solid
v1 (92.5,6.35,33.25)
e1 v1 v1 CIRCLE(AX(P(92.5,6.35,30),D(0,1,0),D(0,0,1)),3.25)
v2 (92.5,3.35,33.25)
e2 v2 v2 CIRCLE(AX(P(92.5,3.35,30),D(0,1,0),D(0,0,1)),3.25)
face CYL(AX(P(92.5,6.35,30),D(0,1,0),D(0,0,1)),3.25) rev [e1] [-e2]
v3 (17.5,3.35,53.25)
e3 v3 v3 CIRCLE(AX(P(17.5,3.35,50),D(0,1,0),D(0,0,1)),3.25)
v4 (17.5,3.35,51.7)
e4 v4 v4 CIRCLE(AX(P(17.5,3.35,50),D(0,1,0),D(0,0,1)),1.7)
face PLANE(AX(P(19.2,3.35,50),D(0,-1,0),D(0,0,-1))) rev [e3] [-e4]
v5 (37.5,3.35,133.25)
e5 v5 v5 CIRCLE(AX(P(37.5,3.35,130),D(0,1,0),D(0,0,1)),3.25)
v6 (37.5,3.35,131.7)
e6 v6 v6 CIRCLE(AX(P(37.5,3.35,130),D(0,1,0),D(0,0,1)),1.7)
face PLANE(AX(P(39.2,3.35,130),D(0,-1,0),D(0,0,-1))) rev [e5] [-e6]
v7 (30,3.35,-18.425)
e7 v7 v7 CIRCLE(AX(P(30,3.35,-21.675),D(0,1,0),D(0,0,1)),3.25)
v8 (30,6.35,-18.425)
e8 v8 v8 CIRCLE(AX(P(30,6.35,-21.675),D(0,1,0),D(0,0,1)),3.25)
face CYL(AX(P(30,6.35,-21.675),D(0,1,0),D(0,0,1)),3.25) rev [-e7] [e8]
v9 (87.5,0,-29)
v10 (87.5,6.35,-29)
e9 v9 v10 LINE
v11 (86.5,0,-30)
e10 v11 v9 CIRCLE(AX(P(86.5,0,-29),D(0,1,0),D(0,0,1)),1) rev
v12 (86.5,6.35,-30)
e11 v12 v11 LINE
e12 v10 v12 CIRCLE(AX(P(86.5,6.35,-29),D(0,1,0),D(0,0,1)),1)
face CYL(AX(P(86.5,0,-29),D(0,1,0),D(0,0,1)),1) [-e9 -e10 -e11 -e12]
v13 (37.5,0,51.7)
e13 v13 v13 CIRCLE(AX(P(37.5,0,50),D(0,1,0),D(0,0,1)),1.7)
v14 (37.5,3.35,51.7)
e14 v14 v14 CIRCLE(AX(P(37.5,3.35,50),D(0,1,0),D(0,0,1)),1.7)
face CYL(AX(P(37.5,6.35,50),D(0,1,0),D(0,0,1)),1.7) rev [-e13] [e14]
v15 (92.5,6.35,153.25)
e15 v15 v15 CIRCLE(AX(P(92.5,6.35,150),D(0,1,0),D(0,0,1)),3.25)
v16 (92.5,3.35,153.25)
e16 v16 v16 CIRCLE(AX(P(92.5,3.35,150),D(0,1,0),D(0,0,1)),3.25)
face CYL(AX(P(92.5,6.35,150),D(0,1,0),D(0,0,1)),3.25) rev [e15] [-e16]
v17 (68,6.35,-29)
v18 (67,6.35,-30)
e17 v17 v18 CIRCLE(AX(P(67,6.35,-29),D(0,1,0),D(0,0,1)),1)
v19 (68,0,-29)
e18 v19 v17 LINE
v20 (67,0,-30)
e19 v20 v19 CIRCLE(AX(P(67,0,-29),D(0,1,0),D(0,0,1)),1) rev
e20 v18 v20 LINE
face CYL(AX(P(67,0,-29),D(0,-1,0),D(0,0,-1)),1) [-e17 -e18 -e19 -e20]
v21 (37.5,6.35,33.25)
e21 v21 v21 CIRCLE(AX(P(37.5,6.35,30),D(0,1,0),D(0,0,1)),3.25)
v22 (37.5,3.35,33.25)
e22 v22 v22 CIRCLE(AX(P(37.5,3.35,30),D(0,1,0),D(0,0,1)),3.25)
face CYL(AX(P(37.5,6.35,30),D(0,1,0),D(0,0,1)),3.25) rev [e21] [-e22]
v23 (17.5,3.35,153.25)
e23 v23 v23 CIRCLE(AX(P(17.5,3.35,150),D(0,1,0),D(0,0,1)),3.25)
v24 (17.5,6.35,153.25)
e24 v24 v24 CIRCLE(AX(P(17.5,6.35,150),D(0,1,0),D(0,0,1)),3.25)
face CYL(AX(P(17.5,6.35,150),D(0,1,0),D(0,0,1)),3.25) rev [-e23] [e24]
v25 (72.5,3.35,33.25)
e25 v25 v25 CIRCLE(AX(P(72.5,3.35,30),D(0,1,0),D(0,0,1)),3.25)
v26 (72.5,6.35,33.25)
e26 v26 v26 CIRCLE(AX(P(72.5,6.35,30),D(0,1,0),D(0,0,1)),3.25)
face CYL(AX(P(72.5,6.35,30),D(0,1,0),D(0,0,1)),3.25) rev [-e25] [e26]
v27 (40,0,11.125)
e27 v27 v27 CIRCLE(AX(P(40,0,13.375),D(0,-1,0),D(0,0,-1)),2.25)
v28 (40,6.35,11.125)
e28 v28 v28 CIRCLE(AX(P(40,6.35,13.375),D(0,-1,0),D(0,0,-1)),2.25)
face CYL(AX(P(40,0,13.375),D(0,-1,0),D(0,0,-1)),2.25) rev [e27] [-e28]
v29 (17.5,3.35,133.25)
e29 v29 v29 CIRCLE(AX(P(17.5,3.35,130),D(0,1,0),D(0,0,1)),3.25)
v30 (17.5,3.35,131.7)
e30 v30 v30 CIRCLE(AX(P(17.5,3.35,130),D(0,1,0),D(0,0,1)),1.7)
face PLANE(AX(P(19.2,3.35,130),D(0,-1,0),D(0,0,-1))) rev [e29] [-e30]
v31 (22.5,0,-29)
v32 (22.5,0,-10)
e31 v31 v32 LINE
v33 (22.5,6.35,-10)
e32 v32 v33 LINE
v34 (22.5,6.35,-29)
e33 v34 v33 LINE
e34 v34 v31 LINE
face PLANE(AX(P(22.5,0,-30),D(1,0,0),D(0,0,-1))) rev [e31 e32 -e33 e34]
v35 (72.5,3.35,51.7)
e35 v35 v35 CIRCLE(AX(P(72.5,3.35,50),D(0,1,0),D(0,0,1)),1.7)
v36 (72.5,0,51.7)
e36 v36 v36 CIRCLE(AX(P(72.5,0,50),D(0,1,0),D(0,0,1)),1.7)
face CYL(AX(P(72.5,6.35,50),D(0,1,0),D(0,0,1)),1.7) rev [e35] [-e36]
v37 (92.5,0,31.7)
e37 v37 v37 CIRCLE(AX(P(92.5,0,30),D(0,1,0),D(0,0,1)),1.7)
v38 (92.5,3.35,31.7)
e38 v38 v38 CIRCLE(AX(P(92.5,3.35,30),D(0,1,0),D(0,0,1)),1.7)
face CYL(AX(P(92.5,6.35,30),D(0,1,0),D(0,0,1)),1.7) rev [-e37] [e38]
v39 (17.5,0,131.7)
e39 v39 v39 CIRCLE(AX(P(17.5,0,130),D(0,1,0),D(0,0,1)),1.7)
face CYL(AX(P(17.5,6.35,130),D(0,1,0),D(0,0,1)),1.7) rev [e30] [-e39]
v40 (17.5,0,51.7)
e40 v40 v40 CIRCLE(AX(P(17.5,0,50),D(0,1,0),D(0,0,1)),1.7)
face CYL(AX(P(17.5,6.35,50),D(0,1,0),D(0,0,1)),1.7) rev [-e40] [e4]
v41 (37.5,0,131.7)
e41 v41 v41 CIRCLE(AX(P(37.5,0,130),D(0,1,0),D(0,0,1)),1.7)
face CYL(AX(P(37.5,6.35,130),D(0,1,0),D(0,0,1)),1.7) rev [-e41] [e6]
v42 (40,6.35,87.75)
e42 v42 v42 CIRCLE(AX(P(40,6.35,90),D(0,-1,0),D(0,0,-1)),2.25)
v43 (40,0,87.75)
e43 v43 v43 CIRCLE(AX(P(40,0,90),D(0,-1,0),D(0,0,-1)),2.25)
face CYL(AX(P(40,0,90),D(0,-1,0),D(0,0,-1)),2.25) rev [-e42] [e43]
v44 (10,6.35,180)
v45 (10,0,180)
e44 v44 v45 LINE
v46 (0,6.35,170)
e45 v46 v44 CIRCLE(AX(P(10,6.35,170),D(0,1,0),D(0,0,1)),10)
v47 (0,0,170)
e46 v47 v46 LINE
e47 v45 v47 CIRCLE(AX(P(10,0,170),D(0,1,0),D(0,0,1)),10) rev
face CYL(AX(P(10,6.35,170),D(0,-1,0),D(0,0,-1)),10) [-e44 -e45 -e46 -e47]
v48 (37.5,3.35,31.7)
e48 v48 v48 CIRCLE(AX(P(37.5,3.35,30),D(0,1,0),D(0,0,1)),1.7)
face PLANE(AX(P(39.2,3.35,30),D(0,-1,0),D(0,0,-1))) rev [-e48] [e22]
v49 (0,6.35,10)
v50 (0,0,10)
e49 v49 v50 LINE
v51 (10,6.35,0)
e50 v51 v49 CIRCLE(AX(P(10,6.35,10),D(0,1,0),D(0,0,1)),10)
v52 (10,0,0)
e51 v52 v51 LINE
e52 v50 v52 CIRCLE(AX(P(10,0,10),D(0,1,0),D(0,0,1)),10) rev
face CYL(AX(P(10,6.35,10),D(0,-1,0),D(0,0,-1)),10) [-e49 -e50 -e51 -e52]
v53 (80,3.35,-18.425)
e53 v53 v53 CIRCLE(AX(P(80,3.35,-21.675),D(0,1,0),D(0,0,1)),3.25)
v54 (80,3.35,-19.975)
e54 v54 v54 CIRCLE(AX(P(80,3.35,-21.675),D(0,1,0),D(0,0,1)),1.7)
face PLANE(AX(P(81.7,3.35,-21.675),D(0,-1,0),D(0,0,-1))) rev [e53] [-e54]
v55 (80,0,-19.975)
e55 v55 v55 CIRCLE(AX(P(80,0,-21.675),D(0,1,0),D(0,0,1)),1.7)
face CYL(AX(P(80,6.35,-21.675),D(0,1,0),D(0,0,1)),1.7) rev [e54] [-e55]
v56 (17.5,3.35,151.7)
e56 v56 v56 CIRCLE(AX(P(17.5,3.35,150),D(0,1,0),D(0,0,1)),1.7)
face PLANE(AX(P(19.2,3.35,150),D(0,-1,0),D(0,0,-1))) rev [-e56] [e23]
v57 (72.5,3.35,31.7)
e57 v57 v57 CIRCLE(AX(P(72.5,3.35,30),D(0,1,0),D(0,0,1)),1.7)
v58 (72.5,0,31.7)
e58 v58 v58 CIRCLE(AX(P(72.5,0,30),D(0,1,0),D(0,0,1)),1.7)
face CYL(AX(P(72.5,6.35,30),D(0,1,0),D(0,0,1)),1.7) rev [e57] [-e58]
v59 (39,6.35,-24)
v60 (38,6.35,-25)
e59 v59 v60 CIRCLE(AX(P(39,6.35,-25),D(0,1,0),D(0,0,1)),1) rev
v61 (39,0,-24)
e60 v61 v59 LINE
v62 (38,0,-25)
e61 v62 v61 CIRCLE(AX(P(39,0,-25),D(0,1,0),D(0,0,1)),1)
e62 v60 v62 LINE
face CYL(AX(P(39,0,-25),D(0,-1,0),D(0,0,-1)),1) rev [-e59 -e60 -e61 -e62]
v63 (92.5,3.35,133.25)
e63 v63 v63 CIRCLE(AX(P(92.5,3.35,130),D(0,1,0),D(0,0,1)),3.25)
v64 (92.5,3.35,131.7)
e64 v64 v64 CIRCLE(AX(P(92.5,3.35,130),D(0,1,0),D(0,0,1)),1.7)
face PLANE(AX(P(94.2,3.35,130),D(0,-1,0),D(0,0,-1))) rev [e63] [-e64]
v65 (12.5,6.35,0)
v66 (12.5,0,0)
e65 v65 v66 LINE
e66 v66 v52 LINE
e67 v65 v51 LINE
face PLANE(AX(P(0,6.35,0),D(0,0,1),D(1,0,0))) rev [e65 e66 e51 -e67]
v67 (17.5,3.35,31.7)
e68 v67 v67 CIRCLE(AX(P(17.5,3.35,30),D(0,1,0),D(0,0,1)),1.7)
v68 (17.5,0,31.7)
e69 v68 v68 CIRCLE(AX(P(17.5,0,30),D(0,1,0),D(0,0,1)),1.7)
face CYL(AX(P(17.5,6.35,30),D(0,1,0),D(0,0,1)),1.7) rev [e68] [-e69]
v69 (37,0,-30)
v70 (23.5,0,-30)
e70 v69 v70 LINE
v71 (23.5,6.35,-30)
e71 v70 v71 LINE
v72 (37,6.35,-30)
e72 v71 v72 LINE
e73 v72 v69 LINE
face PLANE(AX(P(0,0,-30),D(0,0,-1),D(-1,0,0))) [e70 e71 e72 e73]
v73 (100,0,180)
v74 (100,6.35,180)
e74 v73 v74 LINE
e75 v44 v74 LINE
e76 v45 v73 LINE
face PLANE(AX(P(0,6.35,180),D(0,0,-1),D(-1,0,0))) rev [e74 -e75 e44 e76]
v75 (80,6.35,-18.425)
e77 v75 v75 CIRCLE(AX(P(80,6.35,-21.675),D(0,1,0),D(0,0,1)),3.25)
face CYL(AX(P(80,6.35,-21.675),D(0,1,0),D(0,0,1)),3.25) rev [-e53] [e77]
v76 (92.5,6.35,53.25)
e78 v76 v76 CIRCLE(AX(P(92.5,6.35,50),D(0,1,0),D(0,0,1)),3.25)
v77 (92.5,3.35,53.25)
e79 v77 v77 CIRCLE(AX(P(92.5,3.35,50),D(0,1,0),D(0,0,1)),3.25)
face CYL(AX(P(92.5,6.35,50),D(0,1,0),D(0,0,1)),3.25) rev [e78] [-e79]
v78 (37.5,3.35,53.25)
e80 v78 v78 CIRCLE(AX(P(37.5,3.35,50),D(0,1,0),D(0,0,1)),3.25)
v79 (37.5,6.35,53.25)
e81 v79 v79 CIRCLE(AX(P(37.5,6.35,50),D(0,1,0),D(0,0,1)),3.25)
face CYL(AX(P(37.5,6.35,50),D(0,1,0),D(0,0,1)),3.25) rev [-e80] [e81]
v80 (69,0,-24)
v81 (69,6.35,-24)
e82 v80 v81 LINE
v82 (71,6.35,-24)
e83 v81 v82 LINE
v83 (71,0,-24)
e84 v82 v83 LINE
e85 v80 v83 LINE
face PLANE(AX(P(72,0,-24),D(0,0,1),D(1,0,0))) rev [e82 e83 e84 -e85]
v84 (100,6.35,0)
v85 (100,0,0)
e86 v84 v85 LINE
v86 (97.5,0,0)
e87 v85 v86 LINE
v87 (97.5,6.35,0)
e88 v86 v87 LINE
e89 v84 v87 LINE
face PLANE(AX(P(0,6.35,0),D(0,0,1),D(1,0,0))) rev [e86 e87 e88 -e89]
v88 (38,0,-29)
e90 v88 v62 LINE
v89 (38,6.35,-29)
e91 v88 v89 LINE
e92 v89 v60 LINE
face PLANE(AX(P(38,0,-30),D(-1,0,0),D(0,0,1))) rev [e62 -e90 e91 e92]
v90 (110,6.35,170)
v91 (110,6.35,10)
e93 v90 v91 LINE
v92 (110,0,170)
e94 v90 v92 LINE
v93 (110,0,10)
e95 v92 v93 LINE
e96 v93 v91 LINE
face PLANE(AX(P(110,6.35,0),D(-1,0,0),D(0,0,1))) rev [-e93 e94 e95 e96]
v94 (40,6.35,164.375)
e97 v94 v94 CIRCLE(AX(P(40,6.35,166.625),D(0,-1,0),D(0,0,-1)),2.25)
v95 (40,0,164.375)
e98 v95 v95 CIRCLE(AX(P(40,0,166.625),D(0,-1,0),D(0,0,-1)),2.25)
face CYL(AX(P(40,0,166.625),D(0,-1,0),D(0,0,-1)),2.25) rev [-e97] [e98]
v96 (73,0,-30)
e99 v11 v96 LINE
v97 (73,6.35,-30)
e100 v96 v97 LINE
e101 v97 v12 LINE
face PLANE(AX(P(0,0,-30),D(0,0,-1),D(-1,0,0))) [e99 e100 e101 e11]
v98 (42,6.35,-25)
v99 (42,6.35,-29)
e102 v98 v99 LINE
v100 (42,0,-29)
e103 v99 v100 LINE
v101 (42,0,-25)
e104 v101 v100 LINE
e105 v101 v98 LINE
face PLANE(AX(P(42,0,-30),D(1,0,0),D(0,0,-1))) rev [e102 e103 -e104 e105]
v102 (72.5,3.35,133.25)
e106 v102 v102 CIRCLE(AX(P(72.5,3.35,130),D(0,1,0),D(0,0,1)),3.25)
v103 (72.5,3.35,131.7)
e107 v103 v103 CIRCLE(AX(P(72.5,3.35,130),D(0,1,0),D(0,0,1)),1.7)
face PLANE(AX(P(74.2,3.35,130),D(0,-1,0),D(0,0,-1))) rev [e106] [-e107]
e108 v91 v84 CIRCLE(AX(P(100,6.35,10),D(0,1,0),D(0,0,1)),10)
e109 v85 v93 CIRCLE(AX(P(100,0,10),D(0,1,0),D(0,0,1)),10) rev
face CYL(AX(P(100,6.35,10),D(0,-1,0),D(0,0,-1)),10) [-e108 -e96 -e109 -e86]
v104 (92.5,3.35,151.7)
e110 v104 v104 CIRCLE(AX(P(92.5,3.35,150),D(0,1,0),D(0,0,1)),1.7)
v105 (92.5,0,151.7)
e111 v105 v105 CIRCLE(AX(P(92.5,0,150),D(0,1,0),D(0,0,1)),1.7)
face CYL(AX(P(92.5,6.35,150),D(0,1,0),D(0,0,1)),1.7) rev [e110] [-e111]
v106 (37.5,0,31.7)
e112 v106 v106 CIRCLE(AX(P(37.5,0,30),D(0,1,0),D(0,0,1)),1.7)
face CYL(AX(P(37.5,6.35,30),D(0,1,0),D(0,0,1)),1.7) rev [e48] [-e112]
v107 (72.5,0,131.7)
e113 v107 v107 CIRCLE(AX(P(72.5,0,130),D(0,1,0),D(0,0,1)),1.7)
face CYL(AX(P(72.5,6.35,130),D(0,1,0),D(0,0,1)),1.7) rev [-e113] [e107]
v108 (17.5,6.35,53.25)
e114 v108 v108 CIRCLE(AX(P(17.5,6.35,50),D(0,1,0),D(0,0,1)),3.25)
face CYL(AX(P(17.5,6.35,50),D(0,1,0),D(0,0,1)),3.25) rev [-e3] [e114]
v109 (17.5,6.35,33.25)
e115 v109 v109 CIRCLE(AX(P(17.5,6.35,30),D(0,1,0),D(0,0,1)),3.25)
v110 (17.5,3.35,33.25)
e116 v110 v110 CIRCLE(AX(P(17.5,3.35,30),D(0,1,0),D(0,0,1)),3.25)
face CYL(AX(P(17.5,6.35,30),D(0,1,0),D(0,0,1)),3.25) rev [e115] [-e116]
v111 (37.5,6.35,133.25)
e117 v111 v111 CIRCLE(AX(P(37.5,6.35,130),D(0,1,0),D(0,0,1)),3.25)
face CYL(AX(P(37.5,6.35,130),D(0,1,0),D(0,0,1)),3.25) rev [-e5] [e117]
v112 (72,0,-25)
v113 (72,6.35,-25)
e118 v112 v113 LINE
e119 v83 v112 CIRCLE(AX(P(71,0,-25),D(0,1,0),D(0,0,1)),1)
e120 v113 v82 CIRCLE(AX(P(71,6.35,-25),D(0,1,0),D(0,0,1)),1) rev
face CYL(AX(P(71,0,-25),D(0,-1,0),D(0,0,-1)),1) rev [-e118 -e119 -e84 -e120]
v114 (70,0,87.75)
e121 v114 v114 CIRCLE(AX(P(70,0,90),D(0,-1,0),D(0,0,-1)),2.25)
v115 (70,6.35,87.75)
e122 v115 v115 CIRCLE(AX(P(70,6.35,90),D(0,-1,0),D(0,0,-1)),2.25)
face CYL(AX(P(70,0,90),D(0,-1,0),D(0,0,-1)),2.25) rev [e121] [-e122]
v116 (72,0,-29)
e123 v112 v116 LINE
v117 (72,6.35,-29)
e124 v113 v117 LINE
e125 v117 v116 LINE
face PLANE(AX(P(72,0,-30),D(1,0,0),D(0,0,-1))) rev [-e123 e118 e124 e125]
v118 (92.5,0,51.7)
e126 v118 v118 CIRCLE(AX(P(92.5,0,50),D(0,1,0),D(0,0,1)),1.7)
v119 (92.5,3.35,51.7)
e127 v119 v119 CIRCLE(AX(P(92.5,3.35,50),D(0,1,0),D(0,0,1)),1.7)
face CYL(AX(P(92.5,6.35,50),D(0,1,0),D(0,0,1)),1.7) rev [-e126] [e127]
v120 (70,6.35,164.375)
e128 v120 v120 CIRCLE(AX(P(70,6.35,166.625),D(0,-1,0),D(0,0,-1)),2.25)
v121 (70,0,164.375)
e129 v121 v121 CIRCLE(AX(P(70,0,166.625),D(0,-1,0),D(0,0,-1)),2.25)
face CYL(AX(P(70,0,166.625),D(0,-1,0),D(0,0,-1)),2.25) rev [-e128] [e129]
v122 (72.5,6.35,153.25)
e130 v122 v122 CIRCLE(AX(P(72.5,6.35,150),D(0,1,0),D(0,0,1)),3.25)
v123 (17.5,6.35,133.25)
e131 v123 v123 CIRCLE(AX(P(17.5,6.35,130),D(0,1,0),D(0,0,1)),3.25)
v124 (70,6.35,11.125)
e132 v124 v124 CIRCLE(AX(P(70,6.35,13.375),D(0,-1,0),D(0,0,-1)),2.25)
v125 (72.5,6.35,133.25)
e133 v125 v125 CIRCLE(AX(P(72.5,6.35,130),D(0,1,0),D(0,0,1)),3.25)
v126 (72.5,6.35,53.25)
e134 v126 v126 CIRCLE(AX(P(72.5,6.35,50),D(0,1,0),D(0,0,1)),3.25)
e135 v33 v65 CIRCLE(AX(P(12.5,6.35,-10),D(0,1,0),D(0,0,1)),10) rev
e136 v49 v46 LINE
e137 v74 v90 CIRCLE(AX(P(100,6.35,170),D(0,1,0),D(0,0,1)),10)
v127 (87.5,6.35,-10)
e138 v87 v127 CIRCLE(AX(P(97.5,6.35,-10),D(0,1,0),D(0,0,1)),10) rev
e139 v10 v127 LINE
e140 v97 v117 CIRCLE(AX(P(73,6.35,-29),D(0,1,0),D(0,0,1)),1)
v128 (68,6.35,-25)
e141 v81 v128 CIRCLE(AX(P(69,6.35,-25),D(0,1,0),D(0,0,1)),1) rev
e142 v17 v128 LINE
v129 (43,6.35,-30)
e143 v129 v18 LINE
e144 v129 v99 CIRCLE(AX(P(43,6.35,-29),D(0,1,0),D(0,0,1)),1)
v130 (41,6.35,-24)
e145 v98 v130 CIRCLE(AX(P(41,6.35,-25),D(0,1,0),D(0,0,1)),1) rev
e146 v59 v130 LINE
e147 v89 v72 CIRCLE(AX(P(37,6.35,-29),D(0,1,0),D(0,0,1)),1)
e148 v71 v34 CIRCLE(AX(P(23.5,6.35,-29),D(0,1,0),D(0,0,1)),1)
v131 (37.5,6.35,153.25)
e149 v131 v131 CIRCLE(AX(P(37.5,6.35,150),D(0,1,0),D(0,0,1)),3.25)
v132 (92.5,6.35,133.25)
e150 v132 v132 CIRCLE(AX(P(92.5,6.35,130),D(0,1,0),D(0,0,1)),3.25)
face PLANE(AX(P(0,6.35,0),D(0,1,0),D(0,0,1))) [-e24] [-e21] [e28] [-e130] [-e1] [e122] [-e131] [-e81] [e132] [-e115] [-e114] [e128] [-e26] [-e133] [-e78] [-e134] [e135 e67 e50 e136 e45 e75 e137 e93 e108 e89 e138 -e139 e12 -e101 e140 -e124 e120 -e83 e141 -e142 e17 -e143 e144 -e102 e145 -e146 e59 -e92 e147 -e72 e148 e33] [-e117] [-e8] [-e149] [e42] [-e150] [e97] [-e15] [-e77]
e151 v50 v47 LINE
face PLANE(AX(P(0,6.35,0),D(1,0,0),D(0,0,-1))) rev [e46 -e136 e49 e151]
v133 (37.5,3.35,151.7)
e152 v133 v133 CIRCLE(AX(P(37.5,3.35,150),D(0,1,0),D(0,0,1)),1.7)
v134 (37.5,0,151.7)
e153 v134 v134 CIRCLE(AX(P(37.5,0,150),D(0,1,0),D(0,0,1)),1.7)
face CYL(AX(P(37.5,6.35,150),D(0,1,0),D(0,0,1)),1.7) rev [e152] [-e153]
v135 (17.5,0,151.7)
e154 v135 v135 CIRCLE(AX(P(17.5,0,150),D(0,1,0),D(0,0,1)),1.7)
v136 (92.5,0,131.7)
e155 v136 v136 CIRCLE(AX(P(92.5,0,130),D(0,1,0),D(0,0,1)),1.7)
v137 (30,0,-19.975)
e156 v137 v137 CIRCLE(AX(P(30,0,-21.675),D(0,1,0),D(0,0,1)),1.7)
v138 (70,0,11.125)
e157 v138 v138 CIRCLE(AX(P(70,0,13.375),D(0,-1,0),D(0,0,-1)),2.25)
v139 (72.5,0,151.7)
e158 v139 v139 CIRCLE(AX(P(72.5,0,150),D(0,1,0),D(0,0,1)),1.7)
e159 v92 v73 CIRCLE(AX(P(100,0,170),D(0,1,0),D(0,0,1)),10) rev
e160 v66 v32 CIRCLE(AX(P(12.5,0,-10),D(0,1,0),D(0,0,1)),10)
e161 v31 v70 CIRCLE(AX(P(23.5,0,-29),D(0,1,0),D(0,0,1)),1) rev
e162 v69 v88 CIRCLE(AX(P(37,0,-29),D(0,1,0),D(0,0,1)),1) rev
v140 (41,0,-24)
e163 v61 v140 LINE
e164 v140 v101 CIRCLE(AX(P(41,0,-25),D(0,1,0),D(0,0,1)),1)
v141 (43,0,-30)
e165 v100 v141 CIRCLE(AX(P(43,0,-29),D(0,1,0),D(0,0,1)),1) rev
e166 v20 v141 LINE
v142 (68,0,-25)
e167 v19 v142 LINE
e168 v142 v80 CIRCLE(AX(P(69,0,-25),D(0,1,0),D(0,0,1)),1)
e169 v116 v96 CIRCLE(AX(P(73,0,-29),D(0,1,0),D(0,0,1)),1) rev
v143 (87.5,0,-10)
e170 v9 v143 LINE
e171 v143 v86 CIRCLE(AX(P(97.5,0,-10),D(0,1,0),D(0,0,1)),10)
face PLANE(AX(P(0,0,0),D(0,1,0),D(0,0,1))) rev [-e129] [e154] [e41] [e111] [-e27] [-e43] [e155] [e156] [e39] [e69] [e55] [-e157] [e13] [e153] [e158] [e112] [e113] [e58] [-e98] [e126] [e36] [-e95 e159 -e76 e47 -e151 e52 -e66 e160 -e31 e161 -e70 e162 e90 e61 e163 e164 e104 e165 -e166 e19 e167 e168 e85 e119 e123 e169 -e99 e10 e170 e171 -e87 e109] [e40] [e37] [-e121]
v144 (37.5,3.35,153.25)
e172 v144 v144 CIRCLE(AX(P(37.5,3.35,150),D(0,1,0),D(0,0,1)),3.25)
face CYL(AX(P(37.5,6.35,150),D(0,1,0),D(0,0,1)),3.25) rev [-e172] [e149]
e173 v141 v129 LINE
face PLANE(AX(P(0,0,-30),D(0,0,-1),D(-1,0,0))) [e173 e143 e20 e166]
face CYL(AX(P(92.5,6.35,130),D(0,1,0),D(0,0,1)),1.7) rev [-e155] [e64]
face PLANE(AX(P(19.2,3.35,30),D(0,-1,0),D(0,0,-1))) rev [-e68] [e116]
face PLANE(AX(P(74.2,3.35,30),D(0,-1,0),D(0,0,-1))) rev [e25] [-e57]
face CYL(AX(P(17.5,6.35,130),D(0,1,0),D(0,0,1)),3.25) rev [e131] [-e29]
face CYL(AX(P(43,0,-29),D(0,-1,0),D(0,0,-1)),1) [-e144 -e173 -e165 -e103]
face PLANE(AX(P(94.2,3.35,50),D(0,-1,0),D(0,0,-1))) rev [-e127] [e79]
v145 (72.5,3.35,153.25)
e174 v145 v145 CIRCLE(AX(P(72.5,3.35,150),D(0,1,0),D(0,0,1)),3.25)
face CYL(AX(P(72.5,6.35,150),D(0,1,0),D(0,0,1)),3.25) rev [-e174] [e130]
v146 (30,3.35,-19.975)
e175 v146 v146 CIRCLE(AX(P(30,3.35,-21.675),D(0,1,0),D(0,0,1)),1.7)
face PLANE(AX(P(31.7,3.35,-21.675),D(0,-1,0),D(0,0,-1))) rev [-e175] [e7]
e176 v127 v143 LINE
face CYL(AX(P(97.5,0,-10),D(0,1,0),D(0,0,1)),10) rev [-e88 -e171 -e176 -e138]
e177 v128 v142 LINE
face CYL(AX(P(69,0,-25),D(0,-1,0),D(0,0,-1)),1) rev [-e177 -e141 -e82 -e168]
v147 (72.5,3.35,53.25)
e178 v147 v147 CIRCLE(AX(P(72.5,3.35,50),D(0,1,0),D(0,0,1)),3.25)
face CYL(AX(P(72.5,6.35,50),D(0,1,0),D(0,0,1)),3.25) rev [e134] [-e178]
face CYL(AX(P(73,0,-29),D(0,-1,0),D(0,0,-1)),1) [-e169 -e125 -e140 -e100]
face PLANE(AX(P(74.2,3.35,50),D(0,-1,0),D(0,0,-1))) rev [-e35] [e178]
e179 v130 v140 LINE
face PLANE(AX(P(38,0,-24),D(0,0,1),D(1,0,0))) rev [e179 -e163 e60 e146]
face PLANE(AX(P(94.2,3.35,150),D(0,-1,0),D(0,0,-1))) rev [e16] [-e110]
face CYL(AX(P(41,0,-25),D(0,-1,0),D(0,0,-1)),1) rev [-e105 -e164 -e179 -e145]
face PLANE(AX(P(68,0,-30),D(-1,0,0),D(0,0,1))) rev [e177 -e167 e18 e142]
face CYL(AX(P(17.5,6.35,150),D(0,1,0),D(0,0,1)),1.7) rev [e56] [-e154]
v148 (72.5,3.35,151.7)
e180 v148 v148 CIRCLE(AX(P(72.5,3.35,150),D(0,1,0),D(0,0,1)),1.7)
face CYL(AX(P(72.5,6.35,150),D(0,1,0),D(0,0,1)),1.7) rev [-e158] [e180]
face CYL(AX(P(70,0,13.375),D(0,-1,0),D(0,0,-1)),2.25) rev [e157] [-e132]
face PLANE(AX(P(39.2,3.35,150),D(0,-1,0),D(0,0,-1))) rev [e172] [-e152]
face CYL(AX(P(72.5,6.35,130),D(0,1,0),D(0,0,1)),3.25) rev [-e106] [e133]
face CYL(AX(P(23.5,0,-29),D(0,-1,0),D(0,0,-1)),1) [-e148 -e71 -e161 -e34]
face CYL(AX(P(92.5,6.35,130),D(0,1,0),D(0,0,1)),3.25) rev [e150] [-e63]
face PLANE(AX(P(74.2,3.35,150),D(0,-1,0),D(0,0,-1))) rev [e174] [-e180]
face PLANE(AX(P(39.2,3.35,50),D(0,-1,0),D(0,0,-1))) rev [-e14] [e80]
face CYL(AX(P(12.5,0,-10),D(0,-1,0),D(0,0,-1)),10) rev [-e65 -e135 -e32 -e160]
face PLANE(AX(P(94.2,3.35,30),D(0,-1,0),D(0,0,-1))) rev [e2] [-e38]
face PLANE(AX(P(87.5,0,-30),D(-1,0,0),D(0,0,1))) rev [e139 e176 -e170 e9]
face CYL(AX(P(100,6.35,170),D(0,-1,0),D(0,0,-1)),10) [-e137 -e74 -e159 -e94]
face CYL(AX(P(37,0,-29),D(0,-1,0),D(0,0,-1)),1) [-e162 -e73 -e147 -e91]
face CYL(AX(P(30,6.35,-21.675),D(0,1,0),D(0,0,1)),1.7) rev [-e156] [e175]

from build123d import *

# Parameters (mm, degrees)
SKETCH1_W                      = 110
SKETCH1_H                      = 180
BOSS_EXTRUDE1_DEPTH            = 6.35
CBORE_START                    = 3.35
CBORE_FOR_M3_SHCS2_OUTLINE_R   = 3.25
CBORE_FOR_M3_SHCS2_DEPTH       = 3
CBORE_FOR_M3_SHCS2_2_OUTLINE_R = 1.7
CBORE_FOR_M3_SHCS2_2_DEPTH     = 3.35
M4_CLEARANCE_HOLE1_D           = 4.5
SKETCH6_W                      = 65
SKETCH6_H                      = 6.35
BOSS_EXTRUDE2_DEPTH            = 30
CBORE_FOR_M3_SHCS1_D           = 3.4
CBORE_FOR_M3_SHCS1_CBORE_D     = 6.5
CBORE_FOR_M3_SHCS1_CBORE_DEPTH = 3
FILLET2_R                      = 10
FILLET3_R                      = 10
SKETCH9_W                      = 4
SKETCH9_H                      = 6
CUT_EXTRUDE1_DEPTH             = 212.045782948
FILLET4_R                      = 1
FILLET5_R                      = 1
FILLET6_R                      = 1


# Read off the part's stored shape, not the designer's step: CBORE for M3 SHCS2
with BuildPart() as part:
    # Sketch1 → Boss-Extrude1 (new body)
    with BuildSketch(Plane(origin=(0, 0, 0), x_dir=(1, 0, 0), z_dir=(0, 1, 0))):
        with Locations((55, -90)):
            Rectangle(SKETCH1_W, SKETCH1_H)
    extrude(amount=BOSS_EXTRUDE1_DEPTH)

    # CBORE for M3 SHCS2 outline → CBORE for M3 SHCS2 (cut)
    with BuildSketch(Plane(origin=(0, 0, 0), x_dir=(1, 0, 0), z_dir=(0, 1, 0)).offset(CBORE_START)):
        with Locations((37.5, -150)):
            Circle(CBORE_FOR_M3_SHCS2_OUTLINE_R)
        with Locations((37.5, -130)):
            Circle(CBORE_FOR_M3_SHCS2_OUTLINE_R)
        with Locations((17.5, -130)):
            Circle(CBORE_FOR_M3_SHCS2_OUTLINE_R)
        with Locations((72.5, -150)):
            Circle(CBORE_FOR_M3_SHCS2_OUTLINE_R)
        with Locations((72.5, -130)):
            Circle(CBORE_FOR_M3_SHCS2_OUTLINE_R)
        with Locations((92.5, -130)):
            Circle(CBORE_FOR_M3_SHCS2_OUTLINE_R)
        with Locations((72.5, -30)):
            Circle(CBORE_FOR_M3_SHCS2_OUTLINE_R)
        with Locations((92.5, -50)):
            Circle(CBORE_FOR_M3_SHCS2_OUTLINE_R)
        with Locations((72.5, -50)):
            Circle(CBORE_FOR_M3_SHCS2_OUTLINE_R)
        with Locations((37.5, -30)):
            Circle(CBORE_FOR_M3_SHCS2_OUTLINE_R)
        with Locations((17.5, -50)):
            Circle(CBORE_FOR_M3_SHCS2_OUTLINE_R)
        with Locations((37.5, -50)):
            Circle(CBORE_FOR_M3_SHCS2_OUTLINE_R)
        with Locations((92.5, -150)):
            Circle(CBORE_FOR_M3_SHCS2_OUTLINE_R)
        with Locations((17.5, -30)):
            Circle(CBORE_FOR_M3_SHCS2_OUTLINE_R)
        with Locations((17.5, -150)):
            Circle(CBORE_FOR_M3_SHCS2_OUTLINE_R)
        with Locations((92.5, -30)):
            Circle(CBORE_FOR_M3_SHCS2_OUTLINE_R)
    extrude(amount=CBORE_FOR_M3_SHCS2_DEPTH, mode=Mode.SUBTRACT)

    # CBORE for M3 SHCS2 2 outline → CBORE for M3 SHCS2 2 (cut)
    with BuildSketch(Plane(origin=(0, 0, 0), x_dir=(1, 0, 0), z_dir=(0, 1, 0))):
        with Locations((37.5, -150)):
            Circle(CBORE_FOR_M3_SHCS2_2_OUTLINE_R)
        with Locations((37.5, -130)):
            Circle(CBORE_FOR_M3_SHCS2_2_OUTLINE_R)
        with Locations((17.5, -130)):
            Circle(CBORE_FOR_M3_SHCS2_2_OUTLINE_R)
        with Locations((72.5, -150)):
            Circle(CBORE_FOR_M3_SHCS2_2_OUTLINE_R)
        with Locations((72.5, -130)):
            Circle(CBORE_FOR_M3_SHCS2_2_OUTLINE_R)
        with Locations((92.5, -130)):
            Circle(CBORE_FOR_M3_SHCS2_2_OUTLINE_R)
        with Locations((72.5, -30)):
            Circle(CBORE_FOR_M3_SHCS2_2_OUTLINE_R)
        with Locations((92.5, -50)):
            Circle(CBORE_FOR_M3_SHCS2_2_OUTLINE_R)
        with Locations((72.5, -50)):
            Circle(CBORE_FOR_M3_SHCS2_2_OUTLINE_R)
        with Locations((37.5, -30)):
            Circle(CBORE_FOR_M3_SHCS2_2_OUTLINE_R)
        with Locations((17.5, -50)):
            Circle(CBORE_FOR_M3_SHCS2_2_OUTLINE_R)
        with Locations((37.5, -50)):
            Circle(CBORE_FOR_M3_SHCS2_2_OUTLINE_R)
        with Locations((92.5, -150)):
            Circle(CBORE_FOR_M3_SHCS2_2_OUTLINE_R)
        with Locations((17.5, -30)):
            Circle(CBORE_FOR_M3_SHCS2_2_OUTLINE_R)
        with Locations((17.5, -150)):
            Circle(CBORE_FOR_M3_SHCS2_2_OUTLINE_R)
        with Locations((92.5, -30)):
            Circle(CBORE_FOR_M3_SHCS2_2_OUTLINE_R)
    extrude(amount=CBORE_FOR_M3_SHCS2_2_DEPTH, mode=Mode.SUBTRACT)

    # M4 Clearance Hole1 (through all)
    with Locations(Plane.XZ):
        with Locations((70, 13.375), (70, 166.625), (40, 166.625), (70, 90), (40, 90), (40, 13.375)):
            Hole(M4_CLEARANCE_HOLE1_D / 2)

    # Sketch6 → Boss-Extrude2 (add)
    with BuildSketch(Plane(origin=(0, 0, 0), x_dir=(-1, 0, 0), z_dir=(0, 0, -1))):
        with Locations((-55, 3.175)):
            Rectangle(SKETCH6_W, SKETCH6_H)
    extrude(amount=BOSS_EXTRUDE2_DEPTH)

    # CBORE for M3 SHCS1 (through all)
    with Locations(Plane(origin=(0, 6.35, 0), x_dir=(1, 0, 0), z_dir=(0, 1, 0))):
        with Locations((30, 21.675), (80, 21.675)):
            CounterBoreHole(CBORE_FOR_M3_SHCS1_D / 2, CBORE_FOR_M3_SHCS1_CBORE_D / 2, CBORE_FOR_M3_SHCS1_CBORE_DEPTH)

    # Fillet2
    fillet2_edges = [part.edges().sort_by_distance(p)[0] for p in [
        (87.5, 3.175, 0),
        (22.5, 3.175, 0),
    ]]
    fillet(fillet2_edges, radius=FILLET2_R)

    # Fillet3
    fillet3_edges = [part.edges().sort_by_distance(p)[0] for p in [
        (0, 3.175, 0),
        (110, 3.175, 0),
        (110, 3.175, 180),
        (0, 3.175, 180),
    ]]
    fillet(fillet3_edges, radius=FILLET3_R)

    # Sketch9 → Cut-Extrude1 (cut, through all)
    with BuildSketch(Plane(origin=(0, 6.35, 0), x_dir=(1, 0, 0), z_dir=(0, 1, 0))):
        with Locations((70, 27)):
            Rectangle(SKETCH9_W, SKETCH9_H)
        with Locations((40, 27)):
            Rectangle(SKETCH9_W, SKETCH9_H)
    extrude(amount=-CUT_EXTRUDE1_DEPTH, mode=Mode.SUBTRACT)

    # Fillet4
    fillet4_edges = [part.edges().sort_by_distance(p)[0] for p in [
        (38, 3.175, -24),
        (42, 3.175, -24),
        (72, 3.175, -24),
        (68, 3.175, -24),
    ]]
    fillet(fillet4_edges, radius=FILLET4_R)

    # Fillet5
    fillet5_edges = [part.edges().sort_by_distance(p)[0] for p in [
        (38, 3.175, -30),
        (42, 3.175, -30),
        (72, 3.175, -30),
        (68, 3.175, -30),
    ]]
    fillet(fillet5_edges, radius=FILLET5_R)

    # Fillet6
    fillet6_edges = [part.edges().sort_by_distance(p)[0] for p in [
        (87.5, 3.175, -30),
        (22.5, 3.175, -30),
    ]]
    fillet(fillet6_edges, radius=FILLET6_R)


solid = part.part
